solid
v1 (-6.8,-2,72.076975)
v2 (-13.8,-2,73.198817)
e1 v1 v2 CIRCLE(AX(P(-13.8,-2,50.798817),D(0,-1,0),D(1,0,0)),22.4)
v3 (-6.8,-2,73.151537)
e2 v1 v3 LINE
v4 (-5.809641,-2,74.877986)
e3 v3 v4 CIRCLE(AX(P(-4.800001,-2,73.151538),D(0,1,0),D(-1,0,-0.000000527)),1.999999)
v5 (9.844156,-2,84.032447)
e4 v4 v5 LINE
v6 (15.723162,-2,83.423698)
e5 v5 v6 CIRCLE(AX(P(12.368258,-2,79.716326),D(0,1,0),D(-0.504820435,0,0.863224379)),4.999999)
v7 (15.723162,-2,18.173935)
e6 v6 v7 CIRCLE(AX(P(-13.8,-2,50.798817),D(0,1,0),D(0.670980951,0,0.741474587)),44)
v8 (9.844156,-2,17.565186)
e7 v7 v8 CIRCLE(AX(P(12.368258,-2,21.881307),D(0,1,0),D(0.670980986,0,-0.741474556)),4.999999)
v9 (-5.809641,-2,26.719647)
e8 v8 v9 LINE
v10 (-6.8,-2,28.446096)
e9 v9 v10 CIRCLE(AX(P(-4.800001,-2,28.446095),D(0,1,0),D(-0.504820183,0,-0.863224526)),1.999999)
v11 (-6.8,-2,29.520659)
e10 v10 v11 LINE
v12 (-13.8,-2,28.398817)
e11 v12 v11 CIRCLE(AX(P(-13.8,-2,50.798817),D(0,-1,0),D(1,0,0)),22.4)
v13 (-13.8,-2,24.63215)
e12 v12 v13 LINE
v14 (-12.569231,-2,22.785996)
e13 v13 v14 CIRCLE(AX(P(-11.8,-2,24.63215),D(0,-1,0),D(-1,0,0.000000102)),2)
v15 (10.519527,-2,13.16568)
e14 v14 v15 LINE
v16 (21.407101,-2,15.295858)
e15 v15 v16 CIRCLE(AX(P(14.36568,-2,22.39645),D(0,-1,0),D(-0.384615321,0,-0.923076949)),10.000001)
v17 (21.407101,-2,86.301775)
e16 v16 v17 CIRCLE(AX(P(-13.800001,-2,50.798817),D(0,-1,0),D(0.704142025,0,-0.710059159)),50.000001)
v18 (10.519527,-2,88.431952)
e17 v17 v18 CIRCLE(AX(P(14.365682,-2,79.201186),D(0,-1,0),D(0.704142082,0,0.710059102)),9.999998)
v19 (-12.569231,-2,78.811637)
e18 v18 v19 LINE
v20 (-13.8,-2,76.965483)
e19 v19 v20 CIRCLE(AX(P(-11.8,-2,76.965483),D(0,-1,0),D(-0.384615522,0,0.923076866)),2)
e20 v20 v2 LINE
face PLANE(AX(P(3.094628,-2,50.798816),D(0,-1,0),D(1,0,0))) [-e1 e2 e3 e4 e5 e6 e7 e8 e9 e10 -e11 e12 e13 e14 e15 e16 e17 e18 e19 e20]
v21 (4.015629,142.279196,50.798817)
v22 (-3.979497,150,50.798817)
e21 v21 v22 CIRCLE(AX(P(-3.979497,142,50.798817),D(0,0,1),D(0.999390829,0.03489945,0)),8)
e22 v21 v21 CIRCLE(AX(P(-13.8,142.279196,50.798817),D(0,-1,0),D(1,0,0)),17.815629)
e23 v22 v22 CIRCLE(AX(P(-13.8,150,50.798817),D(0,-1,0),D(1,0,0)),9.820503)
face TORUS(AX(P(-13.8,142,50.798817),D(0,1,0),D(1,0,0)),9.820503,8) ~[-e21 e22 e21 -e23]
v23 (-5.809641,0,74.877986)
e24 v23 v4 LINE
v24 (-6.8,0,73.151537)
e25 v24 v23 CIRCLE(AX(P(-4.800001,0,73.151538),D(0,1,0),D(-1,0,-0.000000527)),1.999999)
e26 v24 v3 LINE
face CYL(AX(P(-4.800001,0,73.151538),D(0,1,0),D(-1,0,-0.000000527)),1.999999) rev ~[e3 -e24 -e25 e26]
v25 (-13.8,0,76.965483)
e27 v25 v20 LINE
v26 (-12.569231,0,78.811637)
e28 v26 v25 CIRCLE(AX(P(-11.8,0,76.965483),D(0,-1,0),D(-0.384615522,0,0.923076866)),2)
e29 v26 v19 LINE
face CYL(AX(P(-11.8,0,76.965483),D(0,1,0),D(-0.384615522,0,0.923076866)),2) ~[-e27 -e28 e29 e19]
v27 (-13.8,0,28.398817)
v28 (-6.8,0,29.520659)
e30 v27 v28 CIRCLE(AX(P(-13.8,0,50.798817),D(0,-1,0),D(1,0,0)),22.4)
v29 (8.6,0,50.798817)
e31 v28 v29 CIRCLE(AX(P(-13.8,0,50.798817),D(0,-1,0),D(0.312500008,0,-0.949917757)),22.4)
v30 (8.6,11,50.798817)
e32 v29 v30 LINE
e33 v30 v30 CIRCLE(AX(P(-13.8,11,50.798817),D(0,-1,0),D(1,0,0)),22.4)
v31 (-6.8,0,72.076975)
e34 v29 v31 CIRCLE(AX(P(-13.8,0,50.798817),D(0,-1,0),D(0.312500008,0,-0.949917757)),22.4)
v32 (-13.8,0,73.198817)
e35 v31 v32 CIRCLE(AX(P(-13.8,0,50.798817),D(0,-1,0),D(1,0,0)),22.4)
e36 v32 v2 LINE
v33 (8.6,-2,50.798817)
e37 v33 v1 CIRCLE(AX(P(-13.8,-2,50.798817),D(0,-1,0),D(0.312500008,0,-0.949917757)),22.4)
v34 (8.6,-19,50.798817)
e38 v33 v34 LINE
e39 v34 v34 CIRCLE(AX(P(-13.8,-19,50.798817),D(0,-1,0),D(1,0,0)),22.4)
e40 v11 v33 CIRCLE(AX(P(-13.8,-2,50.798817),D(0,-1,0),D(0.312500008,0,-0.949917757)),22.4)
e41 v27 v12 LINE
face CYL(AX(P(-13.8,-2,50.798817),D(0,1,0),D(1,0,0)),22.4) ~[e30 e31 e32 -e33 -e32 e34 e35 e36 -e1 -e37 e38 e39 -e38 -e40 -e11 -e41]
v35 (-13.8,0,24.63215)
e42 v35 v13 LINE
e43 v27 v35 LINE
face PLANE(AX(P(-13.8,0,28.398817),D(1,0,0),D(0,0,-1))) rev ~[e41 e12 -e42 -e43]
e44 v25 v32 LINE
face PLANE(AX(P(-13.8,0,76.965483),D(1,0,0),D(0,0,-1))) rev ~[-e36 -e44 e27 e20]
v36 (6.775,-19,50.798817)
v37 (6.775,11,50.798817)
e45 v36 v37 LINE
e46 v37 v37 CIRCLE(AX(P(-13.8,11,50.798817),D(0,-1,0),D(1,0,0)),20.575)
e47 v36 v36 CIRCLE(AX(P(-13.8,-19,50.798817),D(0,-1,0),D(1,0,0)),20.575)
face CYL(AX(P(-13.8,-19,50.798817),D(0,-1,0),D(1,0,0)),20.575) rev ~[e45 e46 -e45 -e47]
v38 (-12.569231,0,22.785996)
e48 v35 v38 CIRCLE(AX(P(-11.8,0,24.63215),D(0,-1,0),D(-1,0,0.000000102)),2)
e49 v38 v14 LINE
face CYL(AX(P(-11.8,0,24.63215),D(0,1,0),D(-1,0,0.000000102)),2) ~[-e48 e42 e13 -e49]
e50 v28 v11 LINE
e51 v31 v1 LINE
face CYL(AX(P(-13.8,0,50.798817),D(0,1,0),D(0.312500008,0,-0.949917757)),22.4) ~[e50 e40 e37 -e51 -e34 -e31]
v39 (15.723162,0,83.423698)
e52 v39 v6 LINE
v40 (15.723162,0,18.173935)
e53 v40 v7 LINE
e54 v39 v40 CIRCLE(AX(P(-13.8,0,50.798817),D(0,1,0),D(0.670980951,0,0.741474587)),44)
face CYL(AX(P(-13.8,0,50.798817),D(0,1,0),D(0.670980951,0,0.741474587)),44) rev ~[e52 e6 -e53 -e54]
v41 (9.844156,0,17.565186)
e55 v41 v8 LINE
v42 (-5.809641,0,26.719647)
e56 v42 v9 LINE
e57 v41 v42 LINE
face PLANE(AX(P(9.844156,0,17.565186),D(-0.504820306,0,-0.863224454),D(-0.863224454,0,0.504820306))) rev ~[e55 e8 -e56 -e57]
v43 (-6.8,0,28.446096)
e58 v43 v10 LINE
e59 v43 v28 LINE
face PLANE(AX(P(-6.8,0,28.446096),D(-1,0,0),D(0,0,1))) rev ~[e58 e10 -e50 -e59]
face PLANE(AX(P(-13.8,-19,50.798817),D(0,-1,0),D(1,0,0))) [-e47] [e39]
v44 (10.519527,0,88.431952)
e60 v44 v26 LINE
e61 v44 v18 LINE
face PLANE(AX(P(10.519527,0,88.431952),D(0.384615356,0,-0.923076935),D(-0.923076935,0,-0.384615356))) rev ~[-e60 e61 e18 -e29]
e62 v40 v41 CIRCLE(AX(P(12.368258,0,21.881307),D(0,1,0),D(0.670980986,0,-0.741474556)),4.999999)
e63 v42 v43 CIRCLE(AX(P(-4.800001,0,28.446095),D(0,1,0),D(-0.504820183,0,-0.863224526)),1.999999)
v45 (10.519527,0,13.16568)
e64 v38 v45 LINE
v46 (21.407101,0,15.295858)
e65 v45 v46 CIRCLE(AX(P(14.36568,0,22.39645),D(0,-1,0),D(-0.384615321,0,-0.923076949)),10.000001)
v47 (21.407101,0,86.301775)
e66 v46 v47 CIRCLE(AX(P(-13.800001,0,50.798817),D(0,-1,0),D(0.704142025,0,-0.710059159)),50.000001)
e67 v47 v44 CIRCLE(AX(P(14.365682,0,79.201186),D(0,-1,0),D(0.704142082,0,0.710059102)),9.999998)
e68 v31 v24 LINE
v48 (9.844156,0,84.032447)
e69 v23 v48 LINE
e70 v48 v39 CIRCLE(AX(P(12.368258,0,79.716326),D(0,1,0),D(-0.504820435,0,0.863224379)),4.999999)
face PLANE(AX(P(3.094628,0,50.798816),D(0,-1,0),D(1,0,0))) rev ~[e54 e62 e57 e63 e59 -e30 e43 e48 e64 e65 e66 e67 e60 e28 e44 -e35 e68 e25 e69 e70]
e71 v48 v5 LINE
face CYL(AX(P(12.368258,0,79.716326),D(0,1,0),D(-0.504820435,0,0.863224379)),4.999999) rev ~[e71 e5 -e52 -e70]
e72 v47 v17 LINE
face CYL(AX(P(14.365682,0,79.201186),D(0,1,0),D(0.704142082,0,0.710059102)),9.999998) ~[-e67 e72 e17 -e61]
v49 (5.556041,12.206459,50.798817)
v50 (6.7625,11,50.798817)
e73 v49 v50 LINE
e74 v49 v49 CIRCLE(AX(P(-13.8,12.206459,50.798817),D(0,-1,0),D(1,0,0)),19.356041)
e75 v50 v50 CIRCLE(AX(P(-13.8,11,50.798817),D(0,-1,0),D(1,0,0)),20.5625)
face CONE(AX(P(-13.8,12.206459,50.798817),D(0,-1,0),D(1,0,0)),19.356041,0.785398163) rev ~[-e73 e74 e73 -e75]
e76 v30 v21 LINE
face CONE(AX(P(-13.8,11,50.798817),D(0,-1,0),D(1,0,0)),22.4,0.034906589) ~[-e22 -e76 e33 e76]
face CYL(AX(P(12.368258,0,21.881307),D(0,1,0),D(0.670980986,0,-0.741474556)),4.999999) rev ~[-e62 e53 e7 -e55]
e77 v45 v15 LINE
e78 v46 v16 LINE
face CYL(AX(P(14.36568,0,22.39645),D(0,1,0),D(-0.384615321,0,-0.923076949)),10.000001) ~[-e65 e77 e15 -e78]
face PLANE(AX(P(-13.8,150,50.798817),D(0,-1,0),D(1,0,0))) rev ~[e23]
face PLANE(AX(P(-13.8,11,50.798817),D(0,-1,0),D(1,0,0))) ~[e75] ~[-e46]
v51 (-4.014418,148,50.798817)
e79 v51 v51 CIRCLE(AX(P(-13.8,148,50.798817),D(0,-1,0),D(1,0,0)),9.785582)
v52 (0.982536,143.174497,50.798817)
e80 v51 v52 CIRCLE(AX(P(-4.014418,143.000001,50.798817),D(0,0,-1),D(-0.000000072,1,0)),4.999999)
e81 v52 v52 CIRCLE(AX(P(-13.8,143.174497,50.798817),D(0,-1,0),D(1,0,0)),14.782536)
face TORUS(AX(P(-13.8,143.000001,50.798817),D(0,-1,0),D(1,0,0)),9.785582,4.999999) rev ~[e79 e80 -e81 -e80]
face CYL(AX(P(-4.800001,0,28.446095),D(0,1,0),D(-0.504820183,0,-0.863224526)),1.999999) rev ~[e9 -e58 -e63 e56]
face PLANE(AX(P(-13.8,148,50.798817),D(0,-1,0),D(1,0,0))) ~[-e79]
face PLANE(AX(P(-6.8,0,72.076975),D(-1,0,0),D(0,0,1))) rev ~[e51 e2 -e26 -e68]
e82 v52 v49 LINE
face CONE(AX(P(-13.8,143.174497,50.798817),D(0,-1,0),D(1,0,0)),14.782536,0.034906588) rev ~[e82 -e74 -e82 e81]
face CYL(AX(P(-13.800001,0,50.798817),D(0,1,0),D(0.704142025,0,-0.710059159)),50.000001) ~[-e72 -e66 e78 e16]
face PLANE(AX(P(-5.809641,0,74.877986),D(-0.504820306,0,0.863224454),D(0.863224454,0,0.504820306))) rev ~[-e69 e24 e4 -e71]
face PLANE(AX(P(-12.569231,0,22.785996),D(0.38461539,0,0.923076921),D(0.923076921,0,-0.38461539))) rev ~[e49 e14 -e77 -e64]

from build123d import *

# Parameters (mm, degrees)
F2_R     = 20.575
F3_DEPTH = 2
F4_R     = 22.4
F4_R_2   = 20.575
F5_DEPTH = 17
F6_DEPTH = 30


# Not quite as in the source:
# - ends of sketch curves that miss each other by under 0.0002 mm in the source are joined


with BuildPart() as f3:
    # F2 (on Front) → F3 (new body)
    with BuildSketch(Plane.XZ):
        with BuildLine():
            Line((-13.8, 76.965483), (-13.8, 73.198817))
            ThreePointArc((-13.8, 73.198817), (-36.2, 50.798817), (-13.8, 28.398817))
            Line((-13.8, 28.398817), (-13.8, 24.63215))
            ThreePointArc((-13.8, 24.63215), (-13.464101, 23.52275), (-12.569231, 22.785996))
            Line((-12.569231, 22.785996), (10.519527, 13.16568))
            ThreePointArc((10.519527, 13.16568), (16.285797, 12.582523), (21.407101, 15.295858))
            ThreePointArc((21.407101, 15.295858), (36.2, 50.798817), (21.407101, 86.301775))
            ThreePointArc((21.407101, 86.301775), (16.285797, 89.01511), (10.519527, 88.431952))
            Line((10.519527, 88.431952), (-12.569231, 78.811637))
            ThreePointArc((-12.569231, 78.811637), (-13.464101, 78.074883), (-13.8, 76.965483))
        make_face()
        with Locations((-13.8, 50.798817)):
            Circle(F2_R, mode=Mode.SUBTRACT)
        with BuildLine():
            ThreePointArc((-6.8, 29.520659), (8.6, 50.798817), (-6.8, 72.076975))
            Line((-6.8, 72.076975), (-6.8, 73.151537))
            ThreePointArc((-6.8, 73.151537), (-6.534832, 74.146705), (-5.809641, 74.877986))
            Line((-5.809641, 74.877986), (9.844156, 84.032447))
            ThreePointArc((9.844156, 84.032447), (12.883236, 84.689734), (15.723162, 83.423698))
            ThreePointArc((15.723162, 83.423698), (30.2, 50.798817), (15.723162, 18.173935))
            ThreePointArc((15.723162, 18.173935), (12.883236, 16.907899), (9.844156, 17.565186))
            Line((9.844156, 17.565186), (-5.809641, 26.719647))
            ThreePointArc((-5.809641, 26.719647), (-6.534832, 27.450928), (-6.8, 28.446096))
            Line((-6.8, 28.446096), (-6.8, 29.520659))
        make_face(mode=Mode.SUBTRACT)
    extrude(amount=F3_DEPTH)

    # F4 (on face) → F5 (join)
    with BuildSketch(Plane.XZ.offset(2)):
        with Locations((-13.8, 50.798817)):
            Circle(F4_R)
        with Locations((-13.8, 50.798817)):
            Circle(F4_R_2, mode=Mode.SUBTRACT)
    extrude(amount=F5_DEPTH)

    # F6 (add): a face of the model
    f6_faces = [f3.faces().sort_by_distance(p)[0] for p in [
        (-35.566432, -19, 50.798817),
    ]]
    extrude(f6_faces, amount=-F6_DEPTH)

    # F7 (on plane+point) → F8 (revolve)
    with BuildSketch(Plane.XY.offset(50.798817)):
        with BuildLine():
            Line((6.7625, 11), (8.6, 11))
            Line((8.6, 11), (4.015629, 142.279196))
            ThreePointArc((4.015629, 142.279196), (1.57777, 147.754718), (-3.979497, 150))
            Line((-3.979497, 150), (-13.8, 150))
            Line((-13.8, 150), (-13.8, 148))
            Line((-13.8, 148), (-4.014418, 148))
            ThreePointArc((-4.014418, 148), (-0.541126, 146.596699), (0.982536, 143.174497))
            Line((0.982536, 143.174497), (5.556041, 12.206459))
            Line((5.556041, 12.206459), (6.7625, 11))
        make_face()
    revolve(axis=Axis((-13.8, 149, 50.798817), (0, -1, 0)))


solid = f3.part
